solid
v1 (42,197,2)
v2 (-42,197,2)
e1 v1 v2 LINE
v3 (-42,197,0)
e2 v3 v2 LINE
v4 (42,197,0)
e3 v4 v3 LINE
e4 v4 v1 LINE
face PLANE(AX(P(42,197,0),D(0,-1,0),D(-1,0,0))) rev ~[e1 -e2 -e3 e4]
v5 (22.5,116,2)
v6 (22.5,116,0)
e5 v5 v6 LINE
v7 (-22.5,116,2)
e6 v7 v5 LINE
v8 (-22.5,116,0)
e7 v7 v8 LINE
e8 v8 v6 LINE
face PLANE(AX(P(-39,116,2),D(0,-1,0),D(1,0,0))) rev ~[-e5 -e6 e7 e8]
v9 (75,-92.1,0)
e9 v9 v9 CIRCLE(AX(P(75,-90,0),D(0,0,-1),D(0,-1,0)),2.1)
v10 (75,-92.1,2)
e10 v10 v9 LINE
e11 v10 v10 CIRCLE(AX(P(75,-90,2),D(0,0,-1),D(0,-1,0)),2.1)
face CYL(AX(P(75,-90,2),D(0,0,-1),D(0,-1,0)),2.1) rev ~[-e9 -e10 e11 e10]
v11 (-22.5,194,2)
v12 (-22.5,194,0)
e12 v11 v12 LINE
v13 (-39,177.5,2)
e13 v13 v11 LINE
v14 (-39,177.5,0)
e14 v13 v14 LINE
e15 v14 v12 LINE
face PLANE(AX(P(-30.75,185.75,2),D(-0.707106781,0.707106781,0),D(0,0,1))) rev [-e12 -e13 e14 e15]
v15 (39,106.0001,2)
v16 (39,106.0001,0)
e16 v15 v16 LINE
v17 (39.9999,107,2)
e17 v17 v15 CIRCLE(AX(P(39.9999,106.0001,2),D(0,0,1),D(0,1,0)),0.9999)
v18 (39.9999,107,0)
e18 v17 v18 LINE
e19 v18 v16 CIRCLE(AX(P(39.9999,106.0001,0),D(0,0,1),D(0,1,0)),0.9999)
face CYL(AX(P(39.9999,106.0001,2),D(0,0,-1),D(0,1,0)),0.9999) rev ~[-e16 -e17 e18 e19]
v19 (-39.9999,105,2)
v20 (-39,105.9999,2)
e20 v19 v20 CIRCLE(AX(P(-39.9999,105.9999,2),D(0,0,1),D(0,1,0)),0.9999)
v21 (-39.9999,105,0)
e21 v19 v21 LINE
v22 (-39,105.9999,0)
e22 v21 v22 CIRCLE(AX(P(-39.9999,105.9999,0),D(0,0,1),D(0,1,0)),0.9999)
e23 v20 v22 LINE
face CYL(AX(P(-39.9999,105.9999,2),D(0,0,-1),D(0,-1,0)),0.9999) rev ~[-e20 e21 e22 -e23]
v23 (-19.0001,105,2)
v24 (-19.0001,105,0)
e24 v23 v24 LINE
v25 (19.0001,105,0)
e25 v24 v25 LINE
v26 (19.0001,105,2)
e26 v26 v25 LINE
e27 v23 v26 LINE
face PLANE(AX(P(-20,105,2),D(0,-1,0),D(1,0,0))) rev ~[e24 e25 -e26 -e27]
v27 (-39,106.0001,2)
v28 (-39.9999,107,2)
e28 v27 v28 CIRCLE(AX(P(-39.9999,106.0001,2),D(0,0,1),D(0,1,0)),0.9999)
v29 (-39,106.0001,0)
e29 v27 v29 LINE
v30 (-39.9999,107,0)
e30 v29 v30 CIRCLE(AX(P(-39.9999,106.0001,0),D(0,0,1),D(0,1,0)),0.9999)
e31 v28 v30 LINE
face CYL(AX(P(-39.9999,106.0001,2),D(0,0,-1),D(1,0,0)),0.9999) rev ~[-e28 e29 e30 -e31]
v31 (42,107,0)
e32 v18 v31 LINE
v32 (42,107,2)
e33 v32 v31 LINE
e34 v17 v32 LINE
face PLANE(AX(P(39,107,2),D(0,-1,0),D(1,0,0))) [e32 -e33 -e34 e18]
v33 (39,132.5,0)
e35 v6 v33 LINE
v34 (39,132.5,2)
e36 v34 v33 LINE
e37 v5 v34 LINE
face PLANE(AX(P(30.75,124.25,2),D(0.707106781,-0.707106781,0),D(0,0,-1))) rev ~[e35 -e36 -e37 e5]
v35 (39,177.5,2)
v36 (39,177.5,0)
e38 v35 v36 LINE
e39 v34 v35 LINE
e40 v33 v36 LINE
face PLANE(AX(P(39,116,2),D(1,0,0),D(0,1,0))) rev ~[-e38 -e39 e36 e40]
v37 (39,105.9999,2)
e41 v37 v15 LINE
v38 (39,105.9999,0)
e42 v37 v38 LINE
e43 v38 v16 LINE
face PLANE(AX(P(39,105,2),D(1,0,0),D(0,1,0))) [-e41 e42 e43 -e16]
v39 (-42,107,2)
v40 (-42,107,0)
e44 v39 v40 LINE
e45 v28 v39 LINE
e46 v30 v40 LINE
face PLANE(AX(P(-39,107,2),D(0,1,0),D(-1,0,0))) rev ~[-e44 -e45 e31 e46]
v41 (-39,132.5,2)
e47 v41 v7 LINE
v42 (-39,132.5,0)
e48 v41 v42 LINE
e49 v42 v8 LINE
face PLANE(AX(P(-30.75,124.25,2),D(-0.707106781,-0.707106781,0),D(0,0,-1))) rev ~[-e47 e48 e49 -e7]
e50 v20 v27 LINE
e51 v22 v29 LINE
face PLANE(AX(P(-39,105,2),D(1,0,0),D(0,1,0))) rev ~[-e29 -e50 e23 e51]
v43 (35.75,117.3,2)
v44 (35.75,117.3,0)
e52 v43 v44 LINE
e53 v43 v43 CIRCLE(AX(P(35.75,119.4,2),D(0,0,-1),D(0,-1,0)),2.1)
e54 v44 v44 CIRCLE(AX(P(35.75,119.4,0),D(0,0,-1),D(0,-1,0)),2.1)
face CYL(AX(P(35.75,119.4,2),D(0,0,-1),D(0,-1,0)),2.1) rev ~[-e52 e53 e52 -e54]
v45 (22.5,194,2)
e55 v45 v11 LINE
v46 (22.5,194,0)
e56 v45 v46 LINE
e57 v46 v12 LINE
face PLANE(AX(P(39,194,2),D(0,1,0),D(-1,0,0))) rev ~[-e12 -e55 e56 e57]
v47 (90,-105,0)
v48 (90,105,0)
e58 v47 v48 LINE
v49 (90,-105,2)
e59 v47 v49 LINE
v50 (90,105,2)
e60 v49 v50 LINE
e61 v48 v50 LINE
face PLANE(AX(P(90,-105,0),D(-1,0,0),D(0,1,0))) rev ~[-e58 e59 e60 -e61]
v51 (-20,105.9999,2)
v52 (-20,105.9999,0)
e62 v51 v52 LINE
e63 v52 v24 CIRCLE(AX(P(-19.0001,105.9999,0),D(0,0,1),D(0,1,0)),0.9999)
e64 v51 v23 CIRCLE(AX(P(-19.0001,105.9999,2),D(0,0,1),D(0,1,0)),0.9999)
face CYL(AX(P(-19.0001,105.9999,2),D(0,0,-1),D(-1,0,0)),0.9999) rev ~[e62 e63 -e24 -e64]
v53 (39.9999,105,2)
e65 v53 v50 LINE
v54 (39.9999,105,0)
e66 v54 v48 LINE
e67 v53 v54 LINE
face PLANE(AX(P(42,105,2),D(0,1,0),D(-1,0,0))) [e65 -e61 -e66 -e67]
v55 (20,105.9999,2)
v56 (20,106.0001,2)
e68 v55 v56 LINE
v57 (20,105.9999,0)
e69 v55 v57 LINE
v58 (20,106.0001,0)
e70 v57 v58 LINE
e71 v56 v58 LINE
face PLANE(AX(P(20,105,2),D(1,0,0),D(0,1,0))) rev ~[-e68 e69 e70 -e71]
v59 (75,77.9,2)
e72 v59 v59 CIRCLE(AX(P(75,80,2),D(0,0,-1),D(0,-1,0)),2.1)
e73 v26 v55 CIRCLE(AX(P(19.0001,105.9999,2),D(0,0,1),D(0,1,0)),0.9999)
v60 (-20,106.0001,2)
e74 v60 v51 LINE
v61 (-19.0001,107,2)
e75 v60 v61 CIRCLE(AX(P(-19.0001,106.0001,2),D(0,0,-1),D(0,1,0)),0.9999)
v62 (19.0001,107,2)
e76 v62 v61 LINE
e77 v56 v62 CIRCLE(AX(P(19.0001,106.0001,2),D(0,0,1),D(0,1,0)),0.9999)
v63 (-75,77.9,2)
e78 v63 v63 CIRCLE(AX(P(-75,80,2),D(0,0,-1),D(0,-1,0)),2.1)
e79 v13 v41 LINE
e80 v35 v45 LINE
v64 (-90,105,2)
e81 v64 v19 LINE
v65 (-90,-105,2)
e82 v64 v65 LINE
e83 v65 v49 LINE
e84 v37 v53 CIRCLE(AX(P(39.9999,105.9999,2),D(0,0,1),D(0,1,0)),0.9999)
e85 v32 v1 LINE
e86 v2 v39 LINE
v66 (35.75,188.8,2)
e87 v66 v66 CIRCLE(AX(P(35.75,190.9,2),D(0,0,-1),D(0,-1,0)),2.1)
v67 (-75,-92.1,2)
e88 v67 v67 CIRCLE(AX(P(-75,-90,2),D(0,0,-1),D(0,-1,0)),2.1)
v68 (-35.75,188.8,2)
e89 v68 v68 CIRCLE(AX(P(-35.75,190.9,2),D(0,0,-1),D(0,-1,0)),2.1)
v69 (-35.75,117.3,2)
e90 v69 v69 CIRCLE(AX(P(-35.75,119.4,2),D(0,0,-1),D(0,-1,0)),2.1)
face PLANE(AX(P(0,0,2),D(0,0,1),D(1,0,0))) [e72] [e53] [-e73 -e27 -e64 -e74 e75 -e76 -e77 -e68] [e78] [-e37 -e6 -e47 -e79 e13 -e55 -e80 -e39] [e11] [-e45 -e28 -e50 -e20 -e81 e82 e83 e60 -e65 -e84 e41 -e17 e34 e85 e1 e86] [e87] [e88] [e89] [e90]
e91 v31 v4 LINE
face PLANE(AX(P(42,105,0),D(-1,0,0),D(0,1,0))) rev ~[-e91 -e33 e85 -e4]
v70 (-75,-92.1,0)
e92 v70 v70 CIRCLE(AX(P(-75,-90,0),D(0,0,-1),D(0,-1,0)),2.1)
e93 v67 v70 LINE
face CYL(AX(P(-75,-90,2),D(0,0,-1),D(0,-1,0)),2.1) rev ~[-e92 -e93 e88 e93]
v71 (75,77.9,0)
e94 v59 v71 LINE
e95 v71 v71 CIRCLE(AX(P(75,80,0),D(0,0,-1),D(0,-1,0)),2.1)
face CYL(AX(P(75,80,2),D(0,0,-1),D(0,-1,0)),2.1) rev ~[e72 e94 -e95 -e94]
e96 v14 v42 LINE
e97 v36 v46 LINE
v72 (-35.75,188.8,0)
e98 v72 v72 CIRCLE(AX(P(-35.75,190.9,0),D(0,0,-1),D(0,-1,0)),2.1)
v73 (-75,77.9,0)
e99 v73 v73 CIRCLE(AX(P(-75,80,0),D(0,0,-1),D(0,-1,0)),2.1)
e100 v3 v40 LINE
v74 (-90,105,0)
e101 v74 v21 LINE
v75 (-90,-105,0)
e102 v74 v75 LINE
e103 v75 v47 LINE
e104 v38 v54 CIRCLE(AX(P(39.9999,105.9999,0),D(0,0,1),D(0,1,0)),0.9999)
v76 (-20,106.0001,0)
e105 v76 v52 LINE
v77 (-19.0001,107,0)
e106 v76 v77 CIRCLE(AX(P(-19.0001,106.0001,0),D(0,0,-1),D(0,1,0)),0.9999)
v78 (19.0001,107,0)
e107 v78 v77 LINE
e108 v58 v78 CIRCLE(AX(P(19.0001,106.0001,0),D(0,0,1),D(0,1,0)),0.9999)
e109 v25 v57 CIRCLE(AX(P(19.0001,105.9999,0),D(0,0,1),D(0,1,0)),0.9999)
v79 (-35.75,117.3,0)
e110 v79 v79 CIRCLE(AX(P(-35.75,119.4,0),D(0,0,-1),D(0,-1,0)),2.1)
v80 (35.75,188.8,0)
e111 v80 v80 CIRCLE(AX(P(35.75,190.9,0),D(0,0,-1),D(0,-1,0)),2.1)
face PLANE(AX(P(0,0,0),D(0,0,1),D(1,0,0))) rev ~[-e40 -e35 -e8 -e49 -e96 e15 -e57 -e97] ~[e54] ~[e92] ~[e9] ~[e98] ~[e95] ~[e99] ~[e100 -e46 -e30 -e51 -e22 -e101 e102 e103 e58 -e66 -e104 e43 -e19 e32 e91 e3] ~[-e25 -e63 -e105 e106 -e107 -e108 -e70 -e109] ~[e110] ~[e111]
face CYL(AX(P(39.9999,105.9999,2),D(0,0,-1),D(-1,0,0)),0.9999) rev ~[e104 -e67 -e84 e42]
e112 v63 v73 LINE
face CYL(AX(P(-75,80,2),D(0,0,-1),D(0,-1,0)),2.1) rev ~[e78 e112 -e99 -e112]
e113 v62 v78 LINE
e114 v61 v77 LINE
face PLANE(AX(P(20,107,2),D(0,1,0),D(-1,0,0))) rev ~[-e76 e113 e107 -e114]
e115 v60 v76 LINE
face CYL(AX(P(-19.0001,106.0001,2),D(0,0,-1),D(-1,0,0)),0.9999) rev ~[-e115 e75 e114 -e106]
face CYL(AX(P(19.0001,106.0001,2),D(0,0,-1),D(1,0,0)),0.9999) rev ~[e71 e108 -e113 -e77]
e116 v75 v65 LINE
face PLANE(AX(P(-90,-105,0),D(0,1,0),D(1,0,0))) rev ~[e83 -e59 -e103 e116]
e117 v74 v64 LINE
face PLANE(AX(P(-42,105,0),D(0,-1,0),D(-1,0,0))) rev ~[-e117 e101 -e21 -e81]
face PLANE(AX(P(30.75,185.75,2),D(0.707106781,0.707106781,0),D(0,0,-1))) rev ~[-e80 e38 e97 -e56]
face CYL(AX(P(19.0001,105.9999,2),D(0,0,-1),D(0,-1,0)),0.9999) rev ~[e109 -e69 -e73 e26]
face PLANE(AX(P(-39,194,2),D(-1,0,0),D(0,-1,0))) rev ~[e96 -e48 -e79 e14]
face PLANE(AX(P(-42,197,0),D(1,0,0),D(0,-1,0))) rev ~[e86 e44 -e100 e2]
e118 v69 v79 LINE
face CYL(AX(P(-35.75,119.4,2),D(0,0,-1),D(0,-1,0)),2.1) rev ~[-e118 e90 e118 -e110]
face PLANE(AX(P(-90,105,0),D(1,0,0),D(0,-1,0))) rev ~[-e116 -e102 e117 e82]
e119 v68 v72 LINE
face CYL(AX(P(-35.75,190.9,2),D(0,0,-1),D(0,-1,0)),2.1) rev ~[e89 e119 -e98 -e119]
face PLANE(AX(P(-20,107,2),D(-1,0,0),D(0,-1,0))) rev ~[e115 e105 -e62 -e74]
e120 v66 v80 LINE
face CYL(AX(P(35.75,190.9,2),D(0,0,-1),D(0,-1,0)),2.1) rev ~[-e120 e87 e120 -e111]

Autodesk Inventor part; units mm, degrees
ref_plane "YZ Plane" through (0, 0, 0) normal (1, 0, 0) x (0, 1, 0)
ref_plane "XZ Plane" through (0, 0, 0) normal (0, 1, 0) x (-1, 0, 0)
ref_plane "XY Plane" through (0, 0, 0) normal (0, 0, 1) x (1, 0, 0)
sketch "Sketch1" plane through (0, 0, 0) normal (0, 0, 1) x (1, 0, 0)
  line L0 (-90, -105) -> (90, -105)
  line L1 (90, -105) -> (90, 105)
  line L2 (-90, 105) -> (-90, -105)
  line L3 (42, 105) -> (42, 197)
  line L4 (42, 197) -> (-42, 197)
  line L5 (-42, 197) -> (-42, 105)
  line L6 (90, 105) -> (42, 105)
  line L7 (-42, 105) -> (-90, 105)
  point P0 (0, 0)
  dimension "d0" = 180
  dimension "d1" = 210
  dimension "d2" = 105
  dimension "d3" = 90
  dimension "d22" = 92
  dimension "d24" = 42
  dimension "d26" = 84
  dimension "d28" = 92
  dimension "d29" = 210
  dimension "d30" = 48
  dimension "d31" = 48
extrude "Extrusion1" add sketch "Sketch1" along normal blind 2
sketch "Sketch2" plane through (0, 0, 2) normal (0, 0, 1) x (1, 0, 0)
  line L0 (-90, -105) -> (90, -105) projected
  line L1 (-42, 105) -> (-90, 105) projected
  point P0 (0, 0)
  point P1 (-75, 80)
  point P2 (75, 80)
  point P3 (-75, -90)
  point P4 (75, -90)
  dimension "d6" = 170
  dimension "d8" = 150
  dimension "d9" = 75
  dimension "d10" = 150
  dimension "d11" = 15
  dimension "d12" = 15
  dimension "d13" = 170
  dimension "d14" = 75
  dimension "d27" = 25
hole "Hole1" at (-75, 80, 2) at (75, 80, 2) at (-75, -90, 2) at (75, -90, 2) direction (0, 0, -1) diameter 4.2 end through all
sketch "Sketch3" plane through (0, 0, 2) normal (0, 0, 1) x (1, 0, 0)
  line L0 (-90, 105) -> (-90, -105) projected
  line L1 (90, 105) -> (42, 105) projected
  line L2 (-39, 116) -> (39, 116)
  line L3 (39, 116) -> (39, 194)
  line L4 (39, 194) -> (-39, 194)
  line L5 (-39, 194) -> (-39, 116)
  point P0 (0, 0)
  dimension "d46" = 78
  dimension "d47" = 39
  dimension "d48" = 78
  dimension "d49" = 11
extrude "Extrusion2" cut sketch "Sketch3" against normal blind 10
chamfer "Chamfer1" distance 16.5 angle 45 4 edges at (-39, 116, 1) (39, 116, 1) (-39, 194, 1) (39, 194, 1)
sketch "Sketch4" plane through (0, 0, 2) normal (0, 0, 1) x (1, 0, 0)
  line L0 (-35.75, 190.9) -> (35.75, 190.9) construction
  line L1 (35.75, 190.9) -> (35.75, 119.4) construction
  line L2 (35.75, 119.4) -> (-35.75, 119.4) construction
  line L3 (-35.75, 119.4) -> (-35.75, 190.9) construction
  line L4 (90, 105) -> (42, 105) construction
  point P0 (0, 0)
  dimension "d53" = 71.5
  dimension "d54" = 35.75
  dimension "d55" = 71.5
  dimension "d56" = 14.4
hole "Hole2" at (-35.75, 190.9, 2) at (35.75, 190.9, 2) at (-35.75, 119.4, 2) at (35.75, 119.4, 2) direction (0, 0, -1) diameter 4.2 end through all
sketch "Sketch5" plane through (0, 0, 2) normal (0, 0, 1) x (1, 0, 0)
  line L0 (-42, 197) -> (-42, 105) projected
  line L1 (-42, 105) -> (-39, 105)
  line L2 (-39, 105) -> (-39, 107)
  line L3 (-39, 107) -> (-42, 107)
  line L4 (-42, 107) -> (-42, 105)
  line L5 (90, 105) -> (42, 105) projected
  line L6 (42, 105) -> (39, 105)
  line L7 (39, 105) -> (39, 107)
  line L8 (39, 107) -> (42, 107)
  line L9 (42, 107) -> (42, 105)
  line L10 (-20, 105) -> (20, 105)
  line L11 (20, 105) -> (20, 107)
  line L12 (20, 107) -> (-20, 107)
  line L13 (-20, 107) -> (-20, 105)
  point P0 (0, 0)
  dimension "d64" = 2
  dimension "d65" = 2
  dimension "d66" = 2
  dimension "d67" = 3
  dimension "d68" = 3
  dimension "d69" = 40
  dimension "d70" = 20
extrude "Extrusion3" cut sketch "Sketch5" against normal blind 10
fillet "Fillet1" radius 1 8 edges at (-39, 105, 1) (-39, 107, 1) (-20, 107, 1) (-20, 105, 1) (20, 105, 1) (20, 107, 1) (39, 107, 1) (39, 105, 1)
equation "\"d2\" = 0.5 * d1"
equation "\"d3\" = 0.5 * d0"
equation "\"d24\" = 0.5 * d26"
equation "\"d28\" = d22"
equation "\"d9\" = 0.5 * d8"
equation "\"d10\" = d8"
equation "\"d12\" = d11"
equation "\"d13\" = d6"
equation "\"d14\" = d9"
equation "\"d20\" = Thickness"
equation "\"d47\" = 0.5 * d46"
equation "\"d48\" = d46"
equation "\"d54\" = 0.5 * d53"
equation "\"d55\" = d53"
equation "\"d62\" = Thickness"
equation "\"d70\" = 0.5 * d69"
equation "\"BendRadius\" = Thickness"
equation "\"BendReliefWidth\" = Thickness"
equation "\"BendReliefDepth\" = 0.5 * Thickness"
equation "\"CornerReliefSize\" = 4 * Thickness"
equation "\"MinimumRemnant\" = 2 * Thickness"
equation "\"TransitionRadius\" = BendRadius"
equation "\"JacobiRadiusSize\" = BendRadius"
equation "\"GapSize\" = Thickness"
equation "\"Thickness\" = 0.5"
properties part number "XGEN_hotbed-pcb-org"
